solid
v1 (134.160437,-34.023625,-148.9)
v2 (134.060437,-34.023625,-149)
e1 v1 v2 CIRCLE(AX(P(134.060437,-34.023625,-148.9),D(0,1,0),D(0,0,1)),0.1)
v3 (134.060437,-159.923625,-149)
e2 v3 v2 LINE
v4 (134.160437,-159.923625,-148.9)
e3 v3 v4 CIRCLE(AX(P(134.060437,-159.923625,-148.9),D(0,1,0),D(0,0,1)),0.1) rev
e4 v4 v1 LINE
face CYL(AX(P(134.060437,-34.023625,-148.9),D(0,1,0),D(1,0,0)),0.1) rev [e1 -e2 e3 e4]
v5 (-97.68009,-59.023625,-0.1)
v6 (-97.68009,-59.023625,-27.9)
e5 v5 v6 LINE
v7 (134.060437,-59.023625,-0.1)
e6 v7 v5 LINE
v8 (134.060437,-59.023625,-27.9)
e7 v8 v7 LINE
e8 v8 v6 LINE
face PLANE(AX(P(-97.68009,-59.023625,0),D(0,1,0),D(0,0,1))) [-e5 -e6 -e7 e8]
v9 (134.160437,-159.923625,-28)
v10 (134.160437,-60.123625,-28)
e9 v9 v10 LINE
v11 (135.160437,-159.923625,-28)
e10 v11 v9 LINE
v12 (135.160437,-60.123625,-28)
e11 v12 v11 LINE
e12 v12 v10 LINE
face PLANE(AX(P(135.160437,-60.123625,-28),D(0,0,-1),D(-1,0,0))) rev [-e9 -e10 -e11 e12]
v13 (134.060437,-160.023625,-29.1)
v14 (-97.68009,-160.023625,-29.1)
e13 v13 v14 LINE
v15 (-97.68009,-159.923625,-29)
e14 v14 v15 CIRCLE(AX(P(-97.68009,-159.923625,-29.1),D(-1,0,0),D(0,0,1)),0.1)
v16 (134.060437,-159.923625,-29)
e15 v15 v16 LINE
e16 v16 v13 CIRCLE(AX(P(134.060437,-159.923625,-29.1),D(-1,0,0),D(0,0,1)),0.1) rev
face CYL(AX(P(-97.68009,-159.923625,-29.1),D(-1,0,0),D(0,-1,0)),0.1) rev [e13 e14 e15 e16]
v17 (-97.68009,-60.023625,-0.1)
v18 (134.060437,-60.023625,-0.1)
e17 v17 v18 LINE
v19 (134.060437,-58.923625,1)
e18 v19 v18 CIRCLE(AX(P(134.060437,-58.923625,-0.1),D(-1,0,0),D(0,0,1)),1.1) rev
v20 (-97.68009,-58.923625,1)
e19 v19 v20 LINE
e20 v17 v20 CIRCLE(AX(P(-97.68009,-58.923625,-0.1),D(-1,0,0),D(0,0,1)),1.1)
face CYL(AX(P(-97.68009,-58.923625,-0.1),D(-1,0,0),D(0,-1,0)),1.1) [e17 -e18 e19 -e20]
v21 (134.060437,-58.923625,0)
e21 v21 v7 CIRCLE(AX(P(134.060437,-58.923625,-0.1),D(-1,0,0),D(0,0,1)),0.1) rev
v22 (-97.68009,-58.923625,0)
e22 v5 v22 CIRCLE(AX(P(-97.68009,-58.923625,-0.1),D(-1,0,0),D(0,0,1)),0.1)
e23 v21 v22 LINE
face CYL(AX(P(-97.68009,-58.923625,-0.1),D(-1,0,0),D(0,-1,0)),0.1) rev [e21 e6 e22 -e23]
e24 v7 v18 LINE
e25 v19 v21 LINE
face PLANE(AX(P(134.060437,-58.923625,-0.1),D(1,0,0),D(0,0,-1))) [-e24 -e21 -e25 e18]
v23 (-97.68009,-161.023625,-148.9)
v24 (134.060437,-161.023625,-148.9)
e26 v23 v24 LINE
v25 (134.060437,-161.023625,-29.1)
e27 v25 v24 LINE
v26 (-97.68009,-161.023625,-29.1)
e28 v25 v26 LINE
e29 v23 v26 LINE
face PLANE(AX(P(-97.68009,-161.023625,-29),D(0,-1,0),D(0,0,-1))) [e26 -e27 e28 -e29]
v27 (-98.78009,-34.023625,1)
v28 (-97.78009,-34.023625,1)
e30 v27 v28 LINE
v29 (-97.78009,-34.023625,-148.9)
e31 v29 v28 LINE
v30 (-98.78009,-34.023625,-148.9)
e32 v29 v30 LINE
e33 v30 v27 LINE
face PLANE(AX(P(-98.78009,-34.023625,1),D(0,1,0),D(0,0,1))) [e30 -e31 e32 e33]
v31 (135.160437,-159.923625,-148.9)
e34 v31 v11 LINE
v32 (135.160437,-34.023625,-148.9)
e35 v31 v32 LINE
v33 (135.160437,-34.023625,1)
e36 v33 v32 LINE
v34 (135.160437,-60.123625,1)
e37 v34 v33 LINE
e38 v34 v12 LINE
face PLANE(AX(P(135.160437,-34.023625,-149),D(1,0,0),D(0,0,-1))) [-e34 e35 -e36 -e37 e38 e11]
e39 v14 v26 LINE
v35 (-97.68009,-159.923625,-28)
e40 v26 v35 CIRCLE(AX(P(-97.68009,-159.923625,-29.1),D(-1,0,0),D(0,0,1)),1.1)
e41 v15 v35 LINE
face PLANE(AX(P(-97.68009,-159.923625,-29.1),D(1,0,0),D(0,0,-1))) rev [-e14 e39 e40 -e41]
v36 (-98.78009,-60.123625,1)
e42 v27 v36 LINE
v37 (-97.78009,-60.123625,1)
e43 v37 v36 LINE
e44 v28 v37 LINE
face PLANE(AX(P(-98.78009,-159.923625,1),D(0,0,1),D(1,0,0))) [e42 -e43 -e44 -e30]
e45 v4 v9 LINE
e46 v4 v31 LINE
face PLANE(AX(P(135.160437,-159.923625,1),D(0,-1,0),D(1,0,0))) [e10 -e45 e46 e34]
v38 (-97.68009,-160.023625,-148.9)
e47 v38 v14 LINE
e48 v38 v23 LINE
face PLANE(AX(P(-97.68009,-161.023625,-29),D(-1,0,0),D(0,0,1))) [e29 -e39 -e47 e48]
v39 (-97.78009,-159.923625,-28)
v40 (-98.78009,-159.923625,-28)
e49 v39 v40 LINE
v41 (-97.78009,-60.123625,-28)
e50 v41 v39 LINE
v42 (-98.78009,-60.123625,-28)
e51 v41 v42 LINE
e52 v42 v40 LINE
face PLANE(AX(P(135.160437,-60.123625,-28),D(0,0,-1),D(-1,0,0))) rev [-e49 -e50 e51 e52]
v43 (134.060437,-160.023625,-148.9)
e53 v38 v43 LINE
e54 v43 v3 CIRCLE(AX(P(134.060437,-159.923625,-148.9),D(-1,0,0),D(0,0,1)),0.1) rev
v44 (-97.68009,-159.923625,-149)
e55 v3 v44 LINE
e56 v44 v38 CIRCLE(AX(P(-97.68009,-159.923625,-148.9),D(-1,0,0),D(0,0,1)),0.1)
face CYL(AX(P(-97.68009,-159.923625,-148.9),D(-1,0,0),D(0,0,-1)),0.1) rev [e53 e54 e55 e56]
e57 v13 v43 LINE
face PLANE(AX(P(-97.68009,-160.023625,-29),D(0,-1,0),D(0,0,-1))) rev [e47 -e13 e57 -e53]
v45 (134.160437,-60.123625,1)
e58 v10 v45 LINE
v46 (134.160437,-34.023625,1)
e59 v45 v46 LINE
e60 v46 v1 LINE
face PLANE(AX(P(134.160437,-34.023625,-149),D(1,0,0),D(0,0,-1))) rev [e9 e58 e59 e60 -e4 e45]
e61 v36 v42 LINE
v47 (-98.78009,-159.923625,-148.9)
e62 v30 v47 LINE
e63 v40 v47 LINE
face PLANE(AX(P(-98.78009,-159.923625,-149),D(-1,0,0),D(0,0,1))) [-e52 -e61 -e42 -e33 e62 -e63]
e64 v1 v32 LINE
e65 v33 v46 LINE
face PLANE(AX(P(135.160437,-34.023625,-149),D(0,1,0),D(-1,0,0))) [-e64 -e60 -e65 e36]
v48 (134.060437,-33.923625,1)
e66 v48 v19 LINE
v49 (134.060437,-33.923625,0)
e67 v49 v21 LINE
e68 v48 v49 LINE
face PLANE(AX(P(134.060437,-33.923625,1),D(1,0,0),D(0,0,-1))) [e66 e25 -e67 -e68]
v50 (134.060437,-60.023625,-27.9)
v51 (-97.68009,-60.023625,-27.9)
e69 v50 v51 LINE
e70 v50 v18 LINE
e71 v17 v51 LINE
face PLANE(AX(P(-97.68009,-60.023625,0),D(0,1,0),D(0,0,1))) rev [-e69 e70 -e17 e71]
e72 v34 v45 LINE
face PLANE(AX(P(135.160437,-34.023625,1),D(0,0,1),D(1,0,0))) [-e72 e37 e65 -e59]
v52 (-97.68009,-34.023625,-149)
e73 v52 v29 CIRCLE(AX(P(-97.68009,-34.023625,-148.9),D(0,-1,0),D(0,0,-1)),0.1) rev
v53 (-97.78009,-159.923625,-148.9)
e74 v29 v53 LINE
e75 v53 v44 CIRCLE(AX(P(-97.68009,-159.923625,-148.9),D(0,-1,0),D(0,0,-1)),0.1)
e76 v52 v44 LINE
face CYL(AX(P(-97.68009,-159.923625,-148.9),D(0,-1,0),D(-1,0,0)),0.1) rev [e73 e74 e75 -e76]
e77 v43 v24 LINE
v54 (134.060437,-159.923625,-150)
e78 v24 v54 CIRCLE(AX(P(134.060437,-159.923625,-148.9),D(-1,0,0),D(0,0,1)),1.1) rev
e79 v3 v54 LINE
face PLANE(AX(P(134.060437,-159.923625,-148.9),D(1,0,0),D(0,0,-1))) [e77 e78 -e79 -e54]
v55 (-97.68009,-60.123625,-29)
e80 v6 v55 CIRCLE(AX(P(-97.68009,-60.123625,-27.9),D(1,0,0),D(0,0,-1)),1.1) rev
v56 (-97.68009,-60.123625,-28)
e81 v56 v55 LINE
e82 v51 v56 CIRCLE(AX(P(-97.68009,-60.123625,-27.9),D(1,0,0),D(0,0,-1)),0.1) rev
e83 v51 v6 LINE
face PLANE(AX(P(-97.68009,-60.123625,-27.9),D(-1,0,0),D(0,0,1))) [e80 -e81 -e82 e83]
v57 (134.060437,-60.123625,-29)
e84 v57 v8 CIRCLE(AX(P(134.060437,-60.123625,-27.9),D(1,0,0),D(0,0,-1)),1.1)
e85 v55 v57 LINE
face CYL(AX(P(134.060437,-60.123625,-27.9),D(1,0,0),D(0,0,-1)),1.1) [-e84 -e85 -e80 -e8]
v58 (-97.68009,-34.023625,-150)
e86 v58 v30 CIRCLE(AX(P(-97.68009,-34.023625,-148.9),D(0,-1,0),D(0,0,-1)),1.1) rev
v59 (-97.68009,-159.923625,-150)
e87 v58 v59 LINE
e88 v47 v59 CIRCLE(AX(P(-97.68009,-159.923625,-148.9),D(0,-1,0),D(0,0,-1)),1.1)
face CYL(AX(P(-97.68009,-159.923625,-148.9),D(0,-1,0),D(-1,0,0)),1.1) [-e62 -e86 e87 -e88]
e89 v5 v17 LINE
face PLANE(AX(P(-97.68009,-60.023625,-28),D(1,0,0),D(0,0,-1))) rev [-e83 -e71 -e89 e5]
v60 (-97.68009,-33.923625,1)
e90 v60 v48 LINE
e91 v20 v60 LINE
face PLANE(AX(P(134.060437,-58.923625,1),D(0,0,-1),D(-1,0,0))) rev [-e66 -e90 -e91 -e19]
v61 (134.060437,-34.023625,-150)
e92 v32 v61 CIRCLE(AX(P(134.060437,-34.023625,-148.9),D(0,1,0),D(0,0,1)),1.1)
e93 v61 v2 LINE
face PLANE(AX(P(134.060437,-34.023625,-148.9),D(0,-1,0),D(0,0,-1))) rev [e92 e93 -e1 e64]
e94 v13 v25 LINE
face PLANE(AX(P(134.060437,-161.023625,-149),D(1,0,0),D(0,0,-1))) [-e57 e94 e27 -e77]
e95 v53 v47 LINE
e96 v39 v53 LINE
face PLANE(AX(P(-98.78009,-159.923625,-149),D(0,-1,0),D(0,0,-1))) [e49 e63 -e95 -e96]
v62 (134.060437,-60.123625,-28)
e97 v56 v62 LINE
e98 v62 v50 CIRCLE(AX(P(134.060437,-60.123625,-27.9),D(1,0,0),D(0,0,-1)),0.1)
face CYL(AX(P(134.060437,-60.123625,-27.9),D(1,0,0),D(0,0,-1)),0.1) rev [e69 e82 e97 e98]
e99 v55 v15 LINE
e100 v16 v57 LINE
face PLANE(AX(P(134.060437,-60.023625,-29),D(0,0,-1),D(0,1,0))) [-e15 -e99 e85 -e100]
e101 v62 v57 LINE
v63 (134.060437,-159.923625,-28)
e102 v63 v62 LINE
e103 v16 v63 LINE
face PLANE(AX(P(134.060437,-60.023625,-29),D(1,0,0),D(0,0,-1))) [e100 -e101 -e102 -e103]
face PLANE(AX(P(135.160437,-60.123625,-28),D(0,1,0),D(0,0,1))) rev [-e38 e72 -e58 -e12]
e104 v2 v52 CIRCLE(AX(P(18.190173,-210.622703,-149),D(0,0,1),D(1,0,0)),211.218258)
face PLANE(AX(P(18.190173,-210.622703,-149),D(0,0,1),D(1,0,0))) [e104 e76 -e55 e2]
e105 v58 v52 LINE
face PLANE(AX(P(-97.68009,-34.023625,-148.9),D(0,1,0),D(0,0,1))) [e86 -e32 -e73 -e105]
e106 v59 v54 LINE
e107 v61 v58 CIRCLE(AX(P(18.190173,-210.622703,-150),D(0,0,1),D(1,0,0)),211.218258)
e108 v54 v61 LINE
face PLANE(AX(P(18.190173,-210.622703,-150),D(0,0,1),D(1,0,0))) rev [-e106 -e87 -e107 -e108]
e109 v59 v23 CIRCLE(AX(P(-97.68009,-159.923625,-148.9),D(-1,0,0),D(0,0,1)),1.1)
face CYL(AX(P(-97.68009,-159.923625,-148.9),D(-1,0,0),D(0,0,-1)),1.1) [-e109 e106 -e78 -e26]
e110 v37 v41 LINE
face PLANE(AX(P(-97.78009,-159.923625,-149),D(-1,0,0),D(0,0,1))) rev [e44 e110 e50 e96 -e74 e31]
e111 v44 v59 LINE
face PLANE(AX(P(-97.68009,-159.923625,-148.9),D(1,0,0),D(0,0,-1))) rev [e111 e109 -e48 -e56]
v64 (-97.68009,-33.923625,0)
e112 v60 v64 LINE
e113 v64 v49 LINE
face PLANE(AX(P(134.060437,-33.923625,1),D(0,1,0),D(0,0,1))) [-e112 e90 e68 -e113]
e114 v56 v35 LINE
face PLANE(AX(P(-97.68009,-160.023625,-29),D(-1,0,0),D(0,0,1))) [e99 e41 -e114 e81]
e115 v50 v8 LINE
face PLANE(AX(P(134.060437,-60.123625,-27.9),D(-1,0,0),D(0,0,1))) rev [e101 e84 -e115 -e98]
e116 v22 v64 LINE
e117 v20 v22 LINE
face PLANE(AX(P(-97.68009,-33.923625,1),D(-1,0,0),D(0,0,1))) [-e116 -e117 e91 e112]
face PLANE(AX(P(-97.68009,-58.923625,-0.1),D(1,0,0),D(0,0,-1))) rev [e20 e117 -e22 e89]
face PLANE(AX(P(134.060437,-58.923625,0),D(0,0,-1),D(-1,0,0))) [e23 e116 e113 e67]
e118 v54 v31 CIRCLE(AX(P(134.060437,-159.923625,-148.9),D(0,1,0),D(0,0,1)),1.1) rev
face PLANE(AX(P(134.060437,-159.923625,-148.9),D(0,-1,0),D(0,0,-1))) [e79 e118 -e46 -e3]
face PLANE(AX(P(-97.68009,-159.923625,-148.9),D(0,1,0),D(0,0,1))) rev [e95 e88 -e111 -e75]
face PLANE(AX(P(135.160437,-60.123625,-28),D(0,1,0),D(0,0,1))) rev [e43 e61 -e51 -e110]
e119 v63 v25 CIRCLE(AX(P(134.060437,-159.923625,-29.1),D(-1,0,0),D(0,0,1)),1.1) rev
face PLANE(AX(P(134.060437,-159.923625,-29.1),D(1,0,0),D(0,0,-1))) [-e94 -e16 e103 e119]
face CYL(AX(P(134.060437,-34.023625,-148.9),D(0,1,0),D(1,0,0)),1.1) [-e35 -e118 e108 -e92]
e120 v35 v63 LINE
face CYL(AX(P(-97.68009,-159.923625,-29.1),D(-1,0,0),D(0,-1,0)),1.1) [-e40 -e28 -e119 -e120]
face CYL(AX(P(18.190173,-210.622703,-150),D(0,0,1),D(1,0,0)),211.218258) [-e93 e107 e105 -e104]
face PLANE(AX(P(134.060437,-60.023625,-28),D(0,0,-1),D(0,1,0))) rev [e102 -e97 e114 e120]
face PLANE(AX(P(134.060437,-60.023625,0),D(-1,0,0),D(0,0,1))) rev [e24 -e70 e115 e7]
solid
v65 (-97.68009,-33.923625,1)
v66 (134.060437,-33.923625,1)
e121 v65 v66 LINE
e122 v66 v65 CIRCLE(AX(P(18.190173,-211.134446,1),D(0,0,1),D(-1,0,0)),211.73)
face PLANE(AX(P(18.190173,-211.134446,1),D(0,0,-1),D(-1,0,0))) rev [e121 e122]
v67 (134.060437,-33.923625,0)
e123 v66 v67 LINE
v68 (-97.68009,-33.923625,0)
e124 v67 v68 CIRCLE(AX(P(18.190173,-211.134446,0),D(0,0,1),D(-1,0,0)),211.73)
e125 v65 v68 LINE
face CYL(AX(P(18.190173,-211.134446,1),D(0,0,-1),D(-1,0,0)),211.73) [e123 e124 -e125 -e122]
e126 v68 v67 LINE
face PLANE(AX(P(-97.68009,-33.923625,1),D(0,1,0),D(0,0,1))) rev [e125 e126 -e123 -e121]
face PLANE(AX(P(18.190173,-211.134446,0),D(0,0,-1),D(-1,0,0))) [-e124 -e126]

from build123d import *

# Parameters (mm, degrees)
EXTRUDE_1_DEPTH                  = 1
SKETCH_5_W                       = 231.74052668
SKETCH_5_H                       = 25
SM_BASE_FLANGE_1_DEPTH           = 1
SM_EDGE_FLANGE_1_DEPTH           = 231.74052668
SM_EDGE_FLANGE_2_STRIP_W         = 4.2
SM_EDGE_FLANGE_2_STRIP_H         = 1
SM_EDGE_FLANGE_2_STRIP_CUT_DEPTH = 231.74052668
SM_EDGE_FLANGE_2_DEPTH           = 231.74052668
SM_EDGE_FLANGE_3_STRIP_W         = 4.2
SM_EDGE_FLANGE_3_STRIP_H         = 1
SM_EDGE_FLANGE_3_STRIP_CUT_DEPTH = 231.74052668
SM_EDGE_FLANGE_3_DEPTH           = 231.74052668
SM_EDGE_FLANGE_4_STRIP_W         = 4.2
SM_EDGE_FLANGE_4_STRIP_H         = 1
SM_EDGE_FLANGE_4_STRIP_CUT_DEPTH = 231.74052668
SM_EDGE_FLANGE_4_DEPTH           = 231.74052668
SM_START                         = -1
SM_EDGE_FLANGE_4_FLAT_DEPTH      = 1
SM_EDGE_FLANGE_5_DEPTH           = 125.9
SM_EDGE_FLANGE_6_DEPTH           = 125.9
SKETCH_33_W                      = 29
SKETCH_33_H                      = 99.8
CUT_EXTRUDE_4_DEPTH              = 322.180288583


# Sheet-metal steps are written as plain solids
with BuildPart() as part:
    # Sketch 1 → Вытянуть1 (new body)
    with BuildSketch(Plane.XY):
        with BuildLine():
            Line((-97.680090168, -33.923624823), (134.060436512, -33.923624823))
            ThreePointArc((134.060436512, -33.923624823), (18.190173172, 0.595554476), (-97.680090168, -33.923624823))
        make_face()
    extrude(amount=EXTRUDE_1_DEPTH)


with BuildPart() as body_2:
    # Эскиз5 → Базовая кромка1 (new body)
    with BuildSketch(Plane(origin=(0, 0, 0), x_dir=(-1, 0, 0), z_dir=(0, 0, -1))):
        with Locations((-18.190173172, -46.423624823)):
            Rectangle(SKETCH_5_W, SKETCH_5_H)
    extrude(amount=-SM_BASE_FLANGE_1_DEPTH)

    # Ребро-кромка1 section (across the edge) → Ребро-кромка1 (add)
    with BuildSketch(Plane(origin=(134.060436512, -59.023624823, 0), x_dir=(0, 1, 0), z_dir=(-1, 0, 0))):
        with BuildLine():
            Line((-1, 0.1), (-1, 28))
            Line((-1, 28), (0, 28))
            Line((0, 28), (0, 0.1))
            ThreePointArc((0, 0.1), (0.029289322, 0.029289322), (0.1, 0))
            Line((0.1, 0), (0.1, -1))
            ThreePointArc((0.1, -1), (-0.677817459, -0.677817459), (-1, 0.1))
        make_face()
    extrude(amount=SM_EDGE_FLANGE_1_DEPTH)

    # Ребро-кромка2 strip (across the edge) → Ребро-кромка2 strip cut (cut)
    with BuildSketch(Plane(origin=(-97.680090168, -60.023624823, -28), x_dir=(0, 0, 1), z_dir=(1, 0, 0))):
        with Locations((-2, -0.5)):
            Rectangle(SM_EDGE_FLANGE_2_STRIP_W, SM_EDGE_FLANGE_2_STRIP_H)
    extrude(amount=SM_EDGE_FLANGE_2_STRIP_CUT_DEPTH, mode=Mode.SUBTRACT)

    # Ребро-кромка2 section (across the edge) → Ребро-кромка2 (add)
    with BuildSketch(Plane(origin=(-97.680090168, -60.023624823, -28), x_dir=(0, 0, 1), z_dir=(1, 0, 0))):
        with BuildLine():
            Line((-1, 0.1), (-1, 100))
            Line((-1, 100), (0, 100))
            Line((0, 100), (0, 0.1))
            ThreePointArc((0, 0.1), (0.029289322, 0.029289322), (0.1, 0))
            Line((0.1, 0), (0.1, -1))
            ThreePointArc((0.1, -1), (-0.677817459, -0.677817459), (-1, 0.1))
        make_face()
    extrude(amount=SM_EDGE_FLANGE_2_DEPTH)

    # Ребро-кромка3 strip (across the edge) → Ребро-кромка3 strip cut (cut)
    with BuildSketch(Plane(origin=(134.060436512, -160.023624823, -29), x_dir=(0, 1, 0), z_dir=(-1, 0, 0))):
        with Locations((-2, -0.5)):
            Rectangle(SM_EDGE_FLANGE_3_STRIP_W, SM_EDGE_FLANGE_3_STRIP_H)
    extrude(amount=SM_EDGE_FLANGE_3_STRIP_CUT_DEPTH, mode=Mode.SUBTRACT)

    # Ребро-кромка3 section (across the edge) → Ребро-кромка3 (add)
    with BuildSketch(Plane(origin=(134.060436512, -160.023624823, -29), x_dir=(0, 1, 0), z_dir=(-1, 0, 0))):
        with BuildLine():
            Line((-1, 0.1), (-1, 120))
            Line((-1, 120), (0, 120))
            Line((0, 120), (0, 0.1))
            ThreePointArc((0, 0.1), (0.029289322, 0.029289322), (0.1, 0))
            Line((0.1, 0), (0.1, -1))
            ThreePointArc((0.1, -1), (-0.677817459, -0.677817459), (-1, 0.1))
        make_face()
    extrude(amount=SM_EDGE_FLANGE_3_DEPTH)

    # Ребро-кромка4 strip (across the edge) → Ребро-кромка4 strip cut (cut)
    with BuildSketch(Plane(origin=(134.060436512, -160.023624823, -149), x_dir=(0, 0, 1), z_dir=(-1, 0, 0))):
        with Locations((-2, -0.5)):
            Rectangle(SM_EDGE_FLANGE_4_STRIP_W, SM_EDGE_FLANGE_4_STRIP_H)
    extrude(amount=SM_EDGE_FLANGE_4_STRIP_CUT_DEPTH, mode=Mode.SUBTRACT)

    # Ребро-кромка4 bend section (across the edge) → Ребро-кромка4 (add)
    with BuildSketch(Plane(origin=(134.060436512, -160.023624823, -149), x_dir=(0, 0, 1), z_dir=(-1, 0, 0))):
        with BuildLine():
            Line((-1, 0.1), (0, 0.1))
            ThreePointArc((0, 0.1), (0.029289322, 0.029289322), (0.1, 0))
            Line((0.1, 0), (0.1, -1))
            ThreePointArc((0.1, -1), (-0.677817459, -0.677817459), (-1, 0.1))
        make_face()
    extrude(amount=SM_EDGE_FLANGE_4_DEPTH)

    # Ребро-кромка4 profile (on flange) → Ребро-кромка4 flat (add)
    with BuildSketch(Plane(origin=(0, -160.023624823, -149), x_dir=(1, 0, 0), z_dir=(0, 0, 1)).offset(SM_START)):
        with BuildLine():
            ThreePointArc((134.060436512, 126), (18.190173172, 160.619179382), (-97.680090168, 126))
            Line((-97.680090168, 126), (-97.680090168, 0.1))
            Line((-97.680090168, 0.1), (134.060436512, 0.1))
            Line((134.060436512, 0.1), (134.060436512, 126))
        make_face()
    extrude(amount=SM_EDGE_FLANGE_4_FLAT_DEPTH)

    # Ребро-кромка5 section (across the edge) → Ребро-кромка5 (add)
    with BuildSketch(Plane(origin=(-97.780090168, -34.023624823, -149), x_dir=(1, 0, 0), z_dir=(0, -1, 0))):
        with BuildLine():
            Line((-1, 0.1), (-1, 150))
            Line((-1, 150), (0, 150))
            Line((0, 150), (0, 0.1))
            ThreePointArc((0, 0.1), (0.029289322, 0.029289322), (0.1, 0))
            Line((0.1, 0), (0.1, -1))
            ThreePointArc((0.1, -1), (-0.677817459, -0.677817459), (-1, 0.1))
        make_face()
    extrude(amount=SM_EDGE_FLANGE_5_DEPTH)

    # Ребро-кромка6 section (across the edge) → Ребро-кромка6 (add)
    with BuildSketch(Plane(origin=(134.160436512, -159.923624823, -149), x_dir=(-1, 0, 0), z_dir=(0, 1, 0))):
        with BuildLine():
            Line((-1, 0.1), (-1, 150))
            Line((-1, 150), (0, 150))
            Line((0, 150), (0, 0.1))
            ThreePointArc((0, 0.1), (0.029289322, 0.029289322), (0.1, 0))
            Line((0.1, 0), (0.1, -1))
            ThreePointArc((0.1, -1), (-0.677817459, -0.677817459), (-1, 0.1))
        make_face()
    extrude(amount=SM_EDGE_FLANGE_6_DEPTH)

    # Эскиз33 → Вытянуть4 (cut, through all)
    with BuildSketch(Plane.ZY.offset(98.780090168)):
        with Locations((-13.5, -110.023624823)):
            Rectangle(SKETCH_33_W, SKETCH_33_H)
    extrude(amount=-CUT_EXTRUDE_4_DEPTH, mode=Mode.SUBTRACT)


solid = Compound([part.part, body_2.part])
